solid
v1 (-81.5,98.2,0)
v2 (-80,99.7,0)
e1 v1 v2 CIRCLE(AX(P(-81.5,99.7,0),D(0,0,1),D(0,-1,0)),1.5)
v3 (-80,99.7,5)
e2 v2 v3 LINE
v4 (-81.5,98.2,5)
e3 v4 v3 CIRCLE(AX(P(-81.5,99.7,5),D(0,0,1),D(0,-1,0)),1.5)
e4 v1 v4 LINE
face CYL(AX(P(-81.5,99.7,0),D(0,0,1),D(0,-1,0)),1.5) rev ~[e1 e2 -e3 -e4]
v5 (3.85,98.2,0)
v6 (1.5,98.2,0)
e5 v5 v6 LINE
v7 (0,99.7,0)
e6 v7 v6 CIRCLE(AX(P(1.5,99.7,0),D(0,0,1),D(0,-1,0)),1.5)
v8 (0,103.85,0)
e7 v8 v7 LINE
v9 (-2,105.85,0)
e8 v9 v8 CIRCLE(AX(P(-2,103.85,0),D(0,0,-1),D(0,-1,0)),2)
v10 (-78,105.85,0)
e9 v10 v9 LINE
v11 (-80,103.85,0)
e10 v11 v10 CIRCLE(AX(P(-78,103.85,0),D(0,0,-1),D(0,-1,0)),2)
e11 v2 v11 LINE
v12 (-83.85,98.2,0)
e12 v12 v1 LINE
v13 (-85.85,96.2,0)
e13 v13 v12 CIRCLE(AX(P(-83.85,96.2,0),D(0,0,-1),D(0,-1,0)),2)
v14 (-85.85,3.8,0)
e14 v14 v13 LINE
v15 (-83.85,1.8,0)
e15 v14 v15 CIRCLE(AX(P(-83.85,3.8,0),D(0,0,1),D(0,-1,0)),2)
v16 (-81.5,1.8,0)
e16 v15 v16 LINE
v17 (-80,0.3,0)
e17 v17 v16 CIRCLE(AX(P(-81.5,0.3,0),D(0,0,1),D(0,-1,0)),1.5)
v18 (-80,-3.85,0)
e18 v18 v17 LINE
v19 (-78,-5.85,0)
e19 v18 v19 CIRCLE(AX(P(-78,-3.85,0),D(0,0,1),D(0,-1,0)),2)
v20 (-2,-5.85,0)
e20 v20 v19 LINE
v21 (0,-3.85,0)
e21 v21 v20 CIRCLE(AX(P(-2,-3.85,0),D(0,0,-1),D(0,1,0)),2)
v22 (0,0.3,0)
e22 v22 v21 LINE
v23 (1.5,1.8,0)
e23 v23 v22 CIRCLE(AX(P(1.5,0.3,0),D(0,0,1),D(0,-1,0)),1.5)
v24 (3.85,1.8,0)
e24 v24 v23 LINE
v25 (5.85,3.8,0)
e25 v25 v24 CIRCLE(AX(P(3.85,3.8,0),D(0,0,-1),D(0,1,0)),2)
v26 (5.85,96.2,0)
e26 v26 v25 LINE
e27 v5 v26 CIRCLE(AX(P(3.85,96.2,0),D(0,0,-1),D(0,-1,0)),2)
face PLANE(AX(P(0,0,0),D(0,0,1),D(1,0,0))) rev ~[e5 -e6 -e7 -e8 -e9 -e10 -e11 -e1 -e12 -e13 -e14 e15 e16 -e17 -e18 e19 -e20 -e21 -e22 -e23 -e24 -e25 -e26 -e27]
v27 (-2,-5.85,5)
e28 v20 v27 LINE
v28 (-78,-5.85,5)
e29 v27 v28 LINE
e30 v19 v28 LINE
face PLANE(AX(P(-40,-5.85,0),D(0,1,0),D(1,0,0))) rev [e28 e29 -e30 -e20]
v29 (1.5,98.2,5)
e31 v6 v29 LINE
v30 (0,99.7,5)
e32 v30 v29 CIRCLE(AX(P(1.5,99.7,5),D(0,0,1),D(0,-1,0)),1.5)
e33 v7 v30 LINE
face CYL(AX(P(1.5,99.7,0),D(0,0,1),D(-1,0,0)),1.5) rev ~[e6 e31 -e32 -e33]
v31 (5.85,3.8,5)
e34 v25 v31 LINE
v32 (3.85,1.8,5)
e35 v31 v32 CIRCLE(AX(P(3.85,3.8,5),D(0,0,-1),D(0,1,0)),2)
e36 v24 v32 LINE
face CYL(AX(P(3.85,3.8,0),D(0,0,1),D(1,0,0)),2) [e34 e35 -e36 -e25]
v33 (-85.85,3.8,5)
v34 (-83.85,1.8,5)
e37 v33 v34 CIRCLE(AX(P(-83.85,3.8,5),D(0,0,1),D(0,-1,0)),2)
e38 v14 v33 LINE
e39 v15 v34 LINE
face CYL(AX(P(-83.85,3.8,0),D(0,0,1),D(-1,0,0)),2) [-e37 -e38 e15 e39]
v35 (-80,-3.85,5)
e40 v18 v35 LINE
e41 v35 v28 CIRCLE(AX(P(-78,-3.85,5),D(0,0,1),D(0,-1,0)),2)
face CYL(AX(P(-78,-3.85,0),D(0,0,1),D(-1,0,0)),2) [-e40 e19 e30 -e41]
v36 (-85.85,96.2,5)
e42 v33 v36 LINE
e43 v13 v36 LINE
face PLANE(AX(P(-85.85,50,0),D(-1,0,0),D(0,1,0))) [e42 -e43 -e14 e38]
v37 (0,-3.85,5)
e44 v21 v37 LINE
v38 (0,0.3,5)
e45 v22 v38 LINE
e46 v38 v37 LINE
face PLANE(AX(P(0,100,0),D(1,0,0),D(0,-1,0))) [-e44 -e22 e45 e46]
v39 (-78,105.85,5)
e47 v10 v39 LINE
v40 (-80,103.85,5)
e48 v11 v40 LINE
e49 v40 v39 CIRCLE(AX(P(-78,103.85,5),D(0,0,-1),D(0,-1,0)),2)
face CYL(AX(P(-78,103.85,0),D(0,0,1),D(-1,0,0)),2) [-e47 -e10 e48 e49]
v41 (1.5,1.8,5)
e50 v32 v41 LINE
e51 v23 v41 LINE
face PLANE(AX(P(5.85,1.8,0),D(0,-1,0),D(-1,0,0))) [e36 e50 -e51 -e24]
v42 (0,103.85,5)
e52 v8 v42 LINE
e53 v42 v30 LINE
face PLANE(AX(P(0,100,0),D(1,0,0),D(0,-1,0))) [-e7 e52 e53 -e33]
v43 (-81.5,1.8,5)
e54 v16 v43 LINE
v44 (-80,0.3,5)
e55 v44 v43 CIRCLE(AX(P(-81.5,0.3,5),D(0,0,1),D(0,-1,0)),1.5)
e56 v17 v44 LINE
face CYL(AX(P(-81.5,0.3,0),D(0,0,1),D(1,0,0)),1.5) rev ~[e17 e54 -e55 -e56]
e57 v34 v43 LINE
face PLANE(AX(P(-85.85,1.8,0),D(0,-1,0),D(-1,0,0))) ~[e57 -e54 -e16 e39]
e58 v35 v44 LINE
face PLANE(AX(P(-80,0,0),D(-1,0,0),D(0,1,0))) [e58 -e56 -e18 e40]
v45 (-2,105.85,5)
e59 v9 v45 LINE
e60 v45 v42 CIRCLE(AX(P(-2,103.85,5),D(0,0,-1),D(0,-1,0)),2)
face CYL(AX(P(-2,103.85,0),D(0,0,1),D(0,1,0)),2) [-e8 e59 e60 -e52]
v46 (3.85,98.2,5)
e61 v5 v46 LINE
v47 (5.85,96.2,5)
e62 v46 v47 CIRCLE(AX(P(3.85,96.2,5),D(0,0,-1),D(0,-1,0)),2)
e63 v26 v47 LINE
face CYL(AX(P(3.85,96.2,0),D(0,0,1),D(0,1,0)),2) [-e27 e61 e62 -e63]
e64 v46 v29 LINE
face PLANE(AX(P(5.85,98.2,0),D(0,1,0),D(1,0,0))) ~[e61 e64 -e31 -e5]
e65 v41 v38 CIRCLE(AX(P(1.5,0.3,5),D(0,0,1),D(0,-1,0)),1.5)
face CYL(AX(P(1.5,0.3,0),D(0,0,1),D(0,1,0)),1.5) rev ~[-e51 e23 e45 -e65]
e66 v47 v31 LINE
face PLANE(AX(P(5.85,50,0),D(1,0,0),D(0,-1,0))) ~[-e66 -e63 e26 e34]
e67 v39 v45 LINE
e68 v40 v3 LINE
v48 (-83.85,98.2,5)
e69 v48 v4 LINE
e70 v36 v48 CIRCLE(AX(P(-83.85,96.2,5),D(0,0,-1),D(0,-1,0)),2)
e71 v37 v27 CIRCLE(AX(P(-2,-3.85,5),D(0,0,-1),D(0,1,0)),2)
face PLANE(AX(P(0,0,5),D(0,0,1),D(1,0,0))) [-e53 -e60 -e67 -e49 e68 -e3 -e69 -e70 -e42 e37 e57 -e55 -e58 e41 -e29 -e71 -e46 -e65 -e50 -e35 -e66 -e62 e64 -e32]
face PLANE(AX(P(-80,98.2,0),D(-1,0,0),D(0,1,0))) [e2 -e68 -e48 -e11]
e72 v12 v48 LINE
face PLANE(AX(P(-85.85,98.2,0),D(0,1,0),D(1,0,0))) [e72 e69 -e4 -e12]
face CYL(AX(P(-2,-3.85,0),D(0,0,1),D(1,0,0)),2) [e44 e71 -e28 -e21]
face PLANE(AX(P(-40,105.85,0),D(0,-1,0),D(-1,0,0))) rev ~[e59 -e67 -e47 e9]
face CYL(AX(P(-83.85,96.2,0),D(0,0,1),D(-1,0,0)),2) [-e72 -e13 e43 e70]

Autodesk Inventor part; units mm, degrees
ref_plane "YZ Plane" through (0, 0, 0) normal (1, 0, 0) x (0, 1, 0)
ref_plane "XZ Plane" through (0, 0, 0) normal (0, 1, 0) x (-1, 0, 0)
ref_plane "XY Plane" through (0, 0, 0) normal (0, 0, 1) x (1, 0, 0)
sketch "Skizze3" plane through (0, 0, 0) normal (0, 0, 1) x (1, 0, 0)
  line L0 (0, 0) -> (-80, 0)
  line L1 (-80, 0) -> (-80, 100)
  line L2 (-80, 100) -> (0, 100)
  line L3 (0, 100) -> (0, 0)
  line L4 (-80, 100) -> (0, 100)
  line L5 (-40, 105.85) -> (-80, 105.85)
  line L6 (-80, 105.85) -> (-80, 100)
  line L7 (-80, 50) -> (-85.85, 50)
  line L8 (-85.85, 50) -> (-85.85, 98.2)
  line L9 (-85.85, 98.2) -> (-80, 98.2)
  line L10 (-80, 98.2) -> (-80, 50)
  line L11 (-40, 105.85) -> (-40, 100)
  dimension "d4" = 100
  dimension "d5" = 80
  dimension "d6" = 5.85
  dimension "d7" = 5.85
  dimension "d8" = 1.8
extrude "Extrusion3" add sketch "Skizze3" along normal blind 5 contours L0 L1 L2 L3
extrude "Extrusion4" add sketch "Skizze3" along normal blind 5 contours L7 L8 L9 L1 | L2 L6 L5 L11
fillet "Rundung1" radius 2 2 edges at (-85.85, 98.2, 2.5) (-80, 105.85, 2.5)
mirror "Spiegeln1" about plane through (-85.85, 50, 0) normal (0, -1, 0) of "Extrusion4", "Rundung1"
mirror "Spiegeln2" about plane through (-40, 0, 0) normal (1, 0, 0) of "Extrusion4", "Rundung1", "Spiegeln1"
fillet "Rundung2" radius 1.5 4 edges at (-80, 98.2, 2.5) (-80, 1.8, 2.5) (0, 1.8, 2.5) (0, 98.2, 2.5)
equation "\"d7\" = d6"
properties part number "BT701_trajan20_21" material "Acryl"
